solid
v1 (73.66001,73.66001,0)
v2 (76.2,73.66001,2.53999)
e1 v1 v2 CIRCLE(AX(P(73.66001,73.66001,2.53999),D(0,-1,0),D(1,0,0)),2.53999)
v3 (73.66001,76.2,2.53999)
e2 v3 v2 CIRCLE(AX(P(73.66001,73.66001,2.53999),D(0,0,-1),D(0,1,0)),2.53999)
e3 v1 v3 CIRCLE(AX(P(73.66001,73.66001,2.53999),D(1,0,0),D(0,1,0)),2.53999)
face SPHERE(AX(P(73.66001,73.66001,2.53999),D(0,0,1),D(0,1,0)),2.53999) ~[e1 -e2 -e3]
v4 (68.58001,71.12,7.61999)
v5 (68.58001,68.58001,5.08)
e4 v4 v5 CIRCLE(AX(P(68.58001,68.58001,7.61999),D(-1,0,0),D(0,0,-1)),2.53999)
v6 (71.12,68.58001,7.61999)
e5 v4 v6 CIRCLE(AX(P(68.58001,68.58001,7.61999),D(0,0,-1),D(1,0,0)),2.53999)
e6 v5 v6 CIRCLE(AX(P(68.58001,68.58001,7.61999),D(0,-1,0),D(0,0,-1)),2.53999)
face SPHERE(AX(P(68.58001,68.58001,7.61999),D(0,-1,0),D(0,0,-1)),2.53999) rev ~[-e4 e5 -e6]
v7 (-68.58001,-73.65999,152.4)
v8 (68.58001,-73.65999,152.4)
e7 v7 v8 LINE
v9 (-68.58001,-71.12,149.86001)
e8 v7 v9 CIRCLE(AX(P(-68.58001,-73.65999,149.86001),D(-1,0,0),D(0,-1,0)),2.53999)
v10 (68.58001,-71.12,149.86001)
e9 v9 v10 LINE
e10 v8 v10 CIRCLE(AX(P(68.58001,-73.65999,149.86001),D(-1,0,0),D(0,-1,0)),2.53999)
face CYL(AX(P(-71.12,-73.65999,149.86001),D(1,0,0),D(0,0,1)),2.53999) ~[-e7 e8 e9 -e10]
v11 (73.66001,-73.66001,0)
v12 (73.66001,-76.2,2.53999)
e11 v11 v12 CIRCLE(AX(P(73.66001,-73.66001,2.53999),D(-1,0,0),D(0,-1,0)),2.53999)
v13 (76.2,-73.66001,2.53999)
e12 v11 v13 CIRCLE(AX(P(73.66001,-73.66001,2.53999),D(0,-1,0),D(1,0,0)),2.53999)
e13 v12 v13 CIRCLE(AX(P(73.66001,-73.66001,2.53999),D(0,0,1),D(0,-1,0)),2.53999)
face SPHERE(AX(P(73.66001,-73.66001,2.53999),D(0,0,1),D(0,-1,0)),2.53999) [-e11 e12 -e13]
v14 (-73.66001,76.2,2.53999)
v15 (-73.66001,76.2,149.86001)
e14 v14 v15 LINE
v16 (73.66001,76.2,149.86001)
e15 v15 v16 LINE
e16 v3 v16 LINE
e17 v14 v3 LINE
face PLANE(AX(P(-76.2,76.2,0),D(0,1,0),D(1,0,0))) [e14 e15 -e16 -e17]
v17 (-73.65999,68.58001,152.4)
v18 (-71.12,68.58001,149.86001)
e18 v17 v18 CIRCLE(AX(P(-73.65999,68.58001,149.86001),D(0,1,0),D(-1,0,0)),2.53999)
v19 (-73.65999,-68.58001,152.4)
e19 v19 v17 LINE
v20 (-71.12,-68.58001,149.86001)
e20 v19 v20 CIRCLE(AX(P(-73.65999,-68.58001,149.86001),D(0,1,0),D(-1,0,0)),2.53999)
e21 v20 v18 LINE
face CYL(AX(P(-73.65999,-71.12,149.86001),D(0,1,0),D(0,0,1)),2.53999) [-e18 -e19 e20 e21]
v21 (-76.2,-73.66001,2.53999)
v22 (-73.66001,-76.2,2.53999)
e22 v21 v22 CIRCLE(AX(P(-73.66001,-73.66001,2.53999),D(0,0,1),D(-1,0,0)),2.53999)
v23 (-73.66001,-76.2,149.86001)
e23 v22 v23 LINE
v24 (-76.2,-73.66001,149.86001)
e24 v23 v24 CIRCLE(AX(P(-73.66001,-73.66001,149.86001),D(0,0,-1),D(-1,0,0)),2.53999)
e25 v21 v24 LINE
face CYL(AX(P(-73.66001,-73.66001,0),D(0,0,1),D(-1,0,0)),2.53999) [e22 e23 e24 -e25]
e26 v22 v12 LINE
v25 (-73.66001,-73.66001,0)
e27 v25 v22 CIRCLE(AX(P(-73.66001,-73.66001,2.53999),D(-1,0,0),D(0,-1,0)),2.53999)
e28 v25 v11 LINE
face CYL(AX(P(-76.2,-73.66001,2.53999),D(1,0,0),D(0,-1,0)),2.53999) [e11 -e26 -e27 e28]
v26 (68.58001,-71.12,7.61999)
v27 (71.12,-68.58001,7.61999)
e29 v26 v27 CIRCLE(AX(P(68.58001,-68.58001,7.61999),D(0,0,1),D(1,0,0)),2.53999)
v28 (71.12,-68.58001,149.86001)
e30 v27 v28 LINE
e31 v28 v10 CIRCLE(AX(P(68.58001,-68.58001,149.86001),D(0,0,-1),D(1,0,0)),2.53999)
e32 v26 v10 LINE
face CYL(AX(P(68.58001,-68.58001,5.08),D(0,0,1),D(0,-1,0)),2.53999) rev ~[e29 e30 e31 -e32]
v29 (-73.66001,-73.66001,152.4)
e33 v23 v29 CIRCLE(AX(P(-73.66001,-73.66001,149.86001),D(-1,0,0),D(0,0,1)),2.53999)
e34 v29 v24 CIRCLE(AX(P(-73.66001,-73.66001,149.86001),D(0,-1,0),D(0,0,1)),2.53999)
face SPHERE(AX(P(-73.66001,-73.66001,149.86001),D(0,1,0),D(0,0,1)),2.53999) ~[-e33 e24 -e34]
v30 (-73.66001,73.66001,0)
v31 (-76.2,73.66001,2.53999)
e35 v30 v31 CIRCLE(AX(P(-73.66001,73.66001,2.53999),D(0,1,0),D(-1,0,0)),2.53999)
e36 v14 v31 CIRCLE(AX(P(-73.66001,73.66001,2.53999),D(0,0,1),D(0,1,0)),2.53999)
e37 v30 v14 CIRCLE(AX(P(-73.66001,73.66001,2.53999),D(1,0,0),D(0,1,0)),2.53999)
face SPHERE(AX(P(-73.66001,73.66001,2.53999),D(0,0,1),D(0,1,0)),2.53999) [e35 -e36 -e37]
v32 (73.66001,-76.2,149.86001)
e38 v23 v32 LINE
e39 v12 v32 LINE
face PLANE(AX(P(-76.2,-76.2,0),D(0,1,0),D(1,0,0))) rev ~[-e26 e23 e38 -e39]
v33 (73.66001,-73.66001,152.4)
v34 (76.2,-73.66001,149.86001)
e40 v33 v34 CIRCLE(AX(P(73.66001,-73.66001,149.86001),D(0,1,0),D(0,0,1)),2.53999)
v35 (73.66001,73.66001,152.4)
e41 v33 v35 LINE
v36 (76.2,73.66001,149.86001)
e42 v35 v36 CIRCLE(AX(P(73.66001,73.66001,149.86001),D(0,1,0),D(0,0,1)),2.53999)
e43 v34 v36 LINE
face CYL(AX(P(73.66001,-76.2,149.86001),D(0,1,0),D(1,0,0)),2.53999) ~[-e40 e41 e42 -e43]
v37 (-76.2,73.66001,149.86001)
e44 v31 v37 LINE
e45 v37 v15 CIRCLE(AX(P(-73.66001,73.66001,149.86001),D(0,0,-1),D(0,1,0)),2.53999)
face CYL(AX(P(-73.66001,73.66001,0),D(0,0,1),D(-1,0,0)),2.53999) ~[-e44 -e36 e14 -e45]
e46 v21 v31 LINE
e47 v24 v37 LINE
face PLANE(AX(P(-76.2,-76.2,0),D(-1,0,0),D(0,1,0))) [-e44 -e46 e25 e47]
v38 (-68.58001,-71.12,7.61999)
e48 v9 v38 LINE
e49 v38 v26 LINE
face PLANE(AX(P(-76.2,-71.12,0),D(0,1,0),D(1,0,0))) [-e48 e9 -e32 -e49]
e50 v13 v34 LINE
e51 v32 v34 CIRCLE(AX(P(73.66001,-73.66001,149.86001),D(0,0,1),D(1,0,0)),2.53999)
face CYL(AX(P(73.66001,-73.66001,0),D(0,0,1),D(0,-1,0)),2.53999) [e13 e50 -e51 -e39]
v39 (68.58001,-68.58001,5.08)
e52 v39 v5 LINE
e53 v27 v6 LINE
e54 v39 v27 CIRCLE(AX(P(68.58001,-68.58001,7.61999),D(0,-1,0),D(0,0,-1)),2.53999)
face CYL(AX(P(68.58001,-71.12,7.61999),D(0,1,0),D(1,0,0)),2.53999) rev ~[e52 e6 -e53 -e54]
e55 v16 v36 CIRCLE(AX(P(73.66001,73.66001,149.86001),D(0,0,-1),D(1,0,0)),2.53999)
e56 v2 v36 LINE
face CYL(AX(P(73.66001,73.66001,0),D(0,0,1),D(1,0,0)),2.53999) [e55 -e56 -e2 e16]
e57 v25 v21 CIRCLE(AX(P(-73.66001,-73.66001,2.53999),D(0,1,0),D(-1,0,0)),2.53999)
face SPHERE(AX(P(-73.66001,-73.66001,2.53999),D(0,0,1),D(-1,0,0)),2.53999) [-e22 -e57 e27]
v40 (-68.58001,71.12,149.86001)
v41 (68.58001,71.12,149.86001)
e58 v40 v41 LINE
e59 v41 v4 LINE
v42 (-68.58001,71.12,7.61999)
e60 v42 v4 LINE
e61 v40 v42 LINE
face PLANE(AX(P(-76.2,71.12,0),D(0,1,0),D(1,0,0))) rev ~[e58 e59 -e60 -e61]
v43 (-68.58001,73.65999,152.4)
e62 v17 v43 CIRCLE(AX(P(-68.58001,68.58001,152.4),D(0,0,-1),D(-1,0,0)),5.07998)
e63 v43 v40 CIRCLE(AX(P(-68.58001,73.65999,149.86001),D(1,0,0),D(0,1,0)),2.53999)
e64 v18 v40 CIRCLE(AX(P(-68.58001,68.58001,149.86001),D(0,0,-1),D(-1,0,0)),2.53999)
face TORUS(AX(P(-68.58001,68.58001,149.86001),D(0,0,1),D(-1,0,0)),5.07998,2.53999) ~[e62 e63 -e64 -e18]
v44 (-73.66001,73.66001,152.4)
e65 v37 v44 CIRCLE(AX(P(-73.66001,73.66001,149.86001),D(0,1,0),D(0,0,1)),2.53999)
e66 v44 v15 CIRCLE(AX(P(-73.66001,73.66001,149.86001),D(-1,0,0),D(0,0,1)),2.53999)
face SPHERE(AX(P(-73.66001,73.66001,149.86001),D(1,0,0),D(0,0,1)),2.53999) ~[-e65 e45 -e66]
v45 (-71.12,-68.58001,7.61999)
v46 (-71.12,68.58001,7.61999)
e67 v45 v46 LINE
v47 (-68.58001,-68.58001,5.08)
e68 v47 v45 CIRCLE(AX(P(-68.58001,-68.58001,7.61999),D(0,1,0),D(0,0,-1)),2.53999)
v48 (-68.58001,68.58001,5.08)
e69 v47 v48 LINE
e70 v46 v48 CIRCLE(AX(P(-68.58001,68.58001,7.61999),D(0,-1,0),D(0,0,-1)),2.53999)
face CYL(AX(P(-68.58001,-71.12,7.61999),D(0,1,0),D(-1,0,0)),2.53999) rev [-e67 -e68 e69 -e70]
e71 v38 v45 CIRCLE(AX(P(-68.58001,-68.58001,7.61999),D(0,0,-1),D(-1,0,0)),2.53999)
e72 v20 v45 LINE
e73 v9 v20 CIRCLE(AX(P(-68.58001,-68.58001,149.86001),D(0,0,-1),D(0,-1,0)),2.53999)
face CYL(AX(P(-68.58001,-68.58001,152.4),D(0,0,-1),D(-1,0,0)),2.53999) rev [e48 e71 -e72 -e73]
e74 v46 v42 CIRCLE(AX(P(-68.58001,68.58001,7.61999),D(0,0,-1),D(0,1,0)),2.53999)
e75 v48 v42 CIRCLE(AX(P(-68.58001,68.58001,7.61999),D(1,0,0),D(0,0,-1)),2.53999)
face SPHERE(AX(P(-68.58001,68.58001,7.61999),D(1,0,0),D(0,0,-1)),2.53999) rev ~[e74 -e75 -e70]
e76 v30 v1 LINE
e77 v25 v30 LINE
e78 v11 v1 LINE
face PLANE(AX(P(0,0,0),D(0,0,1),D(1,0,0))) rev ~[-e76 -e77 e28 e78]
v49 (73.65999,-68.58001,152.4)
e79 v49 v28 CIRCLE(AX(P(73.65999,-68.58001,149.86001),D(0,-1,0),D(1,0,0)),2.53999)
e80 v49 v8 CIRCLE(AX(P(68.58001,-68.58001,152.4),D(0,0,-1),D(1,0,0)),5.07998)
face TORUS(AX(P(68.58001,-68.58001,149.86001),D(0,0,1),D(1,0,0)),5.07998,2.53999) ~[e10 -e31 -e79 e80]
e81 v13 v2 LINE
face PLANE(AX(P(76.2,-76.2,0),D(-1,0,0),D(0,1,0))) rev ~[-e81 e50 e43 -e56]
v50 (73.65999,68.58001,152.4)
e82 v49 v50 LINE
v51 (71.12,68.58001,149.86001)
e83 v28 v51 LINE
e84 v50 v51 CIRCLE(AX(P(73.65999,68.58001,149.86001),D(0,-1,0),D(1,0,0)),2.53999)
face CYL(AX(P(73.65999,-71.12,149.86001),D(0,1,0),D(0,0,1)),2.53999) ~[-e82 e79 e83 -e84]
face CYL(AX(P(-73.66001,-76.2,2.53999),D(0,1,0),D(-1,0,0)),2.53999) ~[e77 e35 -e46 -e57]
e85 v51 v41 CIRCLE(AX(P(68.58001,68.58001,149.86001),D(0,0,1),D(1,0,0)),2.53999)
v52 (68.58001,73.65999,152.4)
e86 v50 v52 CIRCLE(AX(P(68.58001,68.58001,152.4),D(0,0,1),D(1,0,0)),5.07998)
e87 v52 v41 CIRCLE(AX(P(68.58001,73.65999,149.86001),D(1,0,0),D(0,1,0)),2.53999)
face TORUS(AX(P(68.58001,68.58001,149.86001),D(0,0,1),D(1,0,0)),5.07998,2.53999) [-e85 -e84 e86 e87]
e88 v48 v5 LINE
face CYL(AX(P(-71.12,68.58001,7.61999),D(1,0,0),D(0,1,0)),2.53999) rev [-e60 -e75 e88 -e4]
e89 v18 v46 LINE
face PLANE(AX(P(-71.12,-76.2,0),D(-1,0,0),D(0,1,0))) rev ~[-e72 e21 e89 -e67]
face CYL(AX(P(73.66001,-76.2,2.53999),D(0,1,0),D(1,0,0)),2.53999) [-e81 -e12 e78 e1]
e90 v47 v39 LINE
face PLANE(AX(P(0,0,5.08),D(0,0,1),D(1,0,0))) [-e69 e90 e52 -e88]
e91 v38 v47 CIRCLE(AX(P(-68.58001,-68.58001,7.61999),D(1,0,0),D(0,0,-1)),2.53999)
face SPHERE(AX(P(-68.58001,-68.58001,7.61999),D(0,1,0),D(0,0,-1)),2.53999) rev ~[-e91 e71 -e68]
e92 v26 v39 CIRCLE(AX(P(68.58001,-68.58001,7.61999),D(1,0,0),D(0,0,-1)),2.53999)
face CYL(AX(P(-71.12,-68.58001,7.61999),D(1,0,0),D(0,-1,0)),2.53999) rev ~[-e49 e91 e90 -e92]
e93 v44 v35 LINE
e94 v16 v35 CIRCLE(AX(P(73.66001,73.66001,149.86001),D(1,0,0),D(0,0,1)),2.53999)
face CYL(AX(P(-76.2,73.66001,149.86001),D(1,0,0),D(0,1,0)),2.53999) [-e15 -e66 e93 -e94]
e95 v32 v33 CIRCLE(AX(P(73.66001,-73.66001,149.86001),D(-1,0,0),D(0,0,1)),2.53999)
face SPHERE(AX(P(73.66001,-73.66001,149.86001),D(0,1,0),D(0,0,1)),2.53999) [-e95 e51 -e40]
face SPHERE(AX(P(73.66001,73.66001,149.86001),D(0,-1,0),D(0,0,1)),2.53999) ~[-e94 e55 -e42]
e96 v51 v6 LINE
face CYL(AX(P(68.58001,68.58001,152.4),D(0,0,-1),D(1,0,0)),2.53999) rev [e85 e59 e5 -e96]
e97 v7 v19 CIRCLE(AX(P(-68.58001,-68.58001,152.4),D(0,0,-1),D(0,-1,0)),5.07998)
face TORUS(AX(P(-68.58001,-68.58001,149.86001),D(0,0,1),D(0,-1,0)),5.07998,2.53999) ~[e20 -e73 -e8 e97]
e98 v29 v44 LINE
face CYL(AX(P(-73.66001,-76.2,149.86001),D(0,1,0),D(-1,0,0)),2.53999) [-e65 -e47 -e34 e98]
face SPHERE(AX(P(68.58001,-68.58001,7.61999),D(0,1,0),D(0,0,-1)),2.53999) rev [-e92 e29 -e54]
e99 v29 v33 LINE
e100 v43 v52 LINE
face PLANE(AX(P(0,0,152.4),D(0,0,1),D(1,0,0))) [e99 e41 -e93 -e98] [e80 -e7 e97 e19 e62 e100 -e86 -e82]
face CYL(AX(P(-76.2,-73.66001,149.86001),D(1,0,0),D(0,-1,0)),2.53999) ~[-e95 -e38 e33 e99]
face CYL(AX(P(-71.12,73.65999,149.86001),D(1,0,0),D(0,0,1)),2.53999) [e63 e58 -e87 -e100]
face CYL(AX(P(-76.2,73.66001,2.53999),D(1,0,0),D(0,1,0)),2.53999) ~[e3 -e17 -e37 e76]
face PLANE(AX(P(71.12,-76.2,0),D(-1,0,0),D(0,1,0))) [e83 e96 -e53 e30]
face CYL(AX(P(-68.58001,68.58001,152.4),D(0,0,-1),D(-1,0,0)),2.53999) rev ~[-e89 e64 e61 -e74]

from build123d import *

# Parameters (mm, degrees)
F0_W     = 152.4
F0_H     = 152.4
F1_DEPTH = 152.4
F2_T     = -5.08
F3_R     = 2.53999


# Not quite as in the source:
# - a fillet or chamfer is up to 0.001 mm smaller than in the source, because OpenCascade refuses the exact size


with BuildPart() as f1:
    # F0 (on Top) → F1 (new body)
    with BuildSketch(Plane.XY):
        Rectangle(F0_W, F0_H)
    extrude(amount=F1_DEPTH)

    # F2
    f2_openings = [f1.faces().sort_by_distance(p)[0] for p in [
        (0, 0, 152.4),
    ]]
    offset(amount=F2_T, openings=f2_openings)

    # F3 (radius 2.54 in the source; OpenCascade refuses exactly that, so slightly less here)
    f3_edges = [f1.edges().sort_by_distance(p)[0] for p in [
        (76.2, 0, 152.4),
        (0, 76.2, 152.4),
        (-76.2, 0, 152.4),
        (0, -76.2, 152.4),
        (71.12, 0, 152.4),
        (0, -71.12, 152.4),
        (-71.12, 0, 152.4),
        (0, 71.12, 152.4),
        (76.2, 76.2, 76.2),
        (-76.2, 76.2, 76.2),
        (0, 76.2, 0),
        (71.12, 0, 5.08),
        (0, 71.12, 5.08),
        (-71.12, 0, 5.08),
        (0, -71.12, 5.08),
        (-71.12, -71.12, 78.74),
        (-71.12, 71.12, 78.74),
        (71.12, -71.12, 78.74),
        (71.12, 71.12, 78.74),
        (-76.2, -76.2, 76.2),
        (-76.2, 0, 0),
        (76.2, -76.2, 76.2),
        (0, -76.2, 0),
        (76.2, 0, 0),
    ]]
    fillet(f3_edges, radius=F3_R)


solid = f1.part
